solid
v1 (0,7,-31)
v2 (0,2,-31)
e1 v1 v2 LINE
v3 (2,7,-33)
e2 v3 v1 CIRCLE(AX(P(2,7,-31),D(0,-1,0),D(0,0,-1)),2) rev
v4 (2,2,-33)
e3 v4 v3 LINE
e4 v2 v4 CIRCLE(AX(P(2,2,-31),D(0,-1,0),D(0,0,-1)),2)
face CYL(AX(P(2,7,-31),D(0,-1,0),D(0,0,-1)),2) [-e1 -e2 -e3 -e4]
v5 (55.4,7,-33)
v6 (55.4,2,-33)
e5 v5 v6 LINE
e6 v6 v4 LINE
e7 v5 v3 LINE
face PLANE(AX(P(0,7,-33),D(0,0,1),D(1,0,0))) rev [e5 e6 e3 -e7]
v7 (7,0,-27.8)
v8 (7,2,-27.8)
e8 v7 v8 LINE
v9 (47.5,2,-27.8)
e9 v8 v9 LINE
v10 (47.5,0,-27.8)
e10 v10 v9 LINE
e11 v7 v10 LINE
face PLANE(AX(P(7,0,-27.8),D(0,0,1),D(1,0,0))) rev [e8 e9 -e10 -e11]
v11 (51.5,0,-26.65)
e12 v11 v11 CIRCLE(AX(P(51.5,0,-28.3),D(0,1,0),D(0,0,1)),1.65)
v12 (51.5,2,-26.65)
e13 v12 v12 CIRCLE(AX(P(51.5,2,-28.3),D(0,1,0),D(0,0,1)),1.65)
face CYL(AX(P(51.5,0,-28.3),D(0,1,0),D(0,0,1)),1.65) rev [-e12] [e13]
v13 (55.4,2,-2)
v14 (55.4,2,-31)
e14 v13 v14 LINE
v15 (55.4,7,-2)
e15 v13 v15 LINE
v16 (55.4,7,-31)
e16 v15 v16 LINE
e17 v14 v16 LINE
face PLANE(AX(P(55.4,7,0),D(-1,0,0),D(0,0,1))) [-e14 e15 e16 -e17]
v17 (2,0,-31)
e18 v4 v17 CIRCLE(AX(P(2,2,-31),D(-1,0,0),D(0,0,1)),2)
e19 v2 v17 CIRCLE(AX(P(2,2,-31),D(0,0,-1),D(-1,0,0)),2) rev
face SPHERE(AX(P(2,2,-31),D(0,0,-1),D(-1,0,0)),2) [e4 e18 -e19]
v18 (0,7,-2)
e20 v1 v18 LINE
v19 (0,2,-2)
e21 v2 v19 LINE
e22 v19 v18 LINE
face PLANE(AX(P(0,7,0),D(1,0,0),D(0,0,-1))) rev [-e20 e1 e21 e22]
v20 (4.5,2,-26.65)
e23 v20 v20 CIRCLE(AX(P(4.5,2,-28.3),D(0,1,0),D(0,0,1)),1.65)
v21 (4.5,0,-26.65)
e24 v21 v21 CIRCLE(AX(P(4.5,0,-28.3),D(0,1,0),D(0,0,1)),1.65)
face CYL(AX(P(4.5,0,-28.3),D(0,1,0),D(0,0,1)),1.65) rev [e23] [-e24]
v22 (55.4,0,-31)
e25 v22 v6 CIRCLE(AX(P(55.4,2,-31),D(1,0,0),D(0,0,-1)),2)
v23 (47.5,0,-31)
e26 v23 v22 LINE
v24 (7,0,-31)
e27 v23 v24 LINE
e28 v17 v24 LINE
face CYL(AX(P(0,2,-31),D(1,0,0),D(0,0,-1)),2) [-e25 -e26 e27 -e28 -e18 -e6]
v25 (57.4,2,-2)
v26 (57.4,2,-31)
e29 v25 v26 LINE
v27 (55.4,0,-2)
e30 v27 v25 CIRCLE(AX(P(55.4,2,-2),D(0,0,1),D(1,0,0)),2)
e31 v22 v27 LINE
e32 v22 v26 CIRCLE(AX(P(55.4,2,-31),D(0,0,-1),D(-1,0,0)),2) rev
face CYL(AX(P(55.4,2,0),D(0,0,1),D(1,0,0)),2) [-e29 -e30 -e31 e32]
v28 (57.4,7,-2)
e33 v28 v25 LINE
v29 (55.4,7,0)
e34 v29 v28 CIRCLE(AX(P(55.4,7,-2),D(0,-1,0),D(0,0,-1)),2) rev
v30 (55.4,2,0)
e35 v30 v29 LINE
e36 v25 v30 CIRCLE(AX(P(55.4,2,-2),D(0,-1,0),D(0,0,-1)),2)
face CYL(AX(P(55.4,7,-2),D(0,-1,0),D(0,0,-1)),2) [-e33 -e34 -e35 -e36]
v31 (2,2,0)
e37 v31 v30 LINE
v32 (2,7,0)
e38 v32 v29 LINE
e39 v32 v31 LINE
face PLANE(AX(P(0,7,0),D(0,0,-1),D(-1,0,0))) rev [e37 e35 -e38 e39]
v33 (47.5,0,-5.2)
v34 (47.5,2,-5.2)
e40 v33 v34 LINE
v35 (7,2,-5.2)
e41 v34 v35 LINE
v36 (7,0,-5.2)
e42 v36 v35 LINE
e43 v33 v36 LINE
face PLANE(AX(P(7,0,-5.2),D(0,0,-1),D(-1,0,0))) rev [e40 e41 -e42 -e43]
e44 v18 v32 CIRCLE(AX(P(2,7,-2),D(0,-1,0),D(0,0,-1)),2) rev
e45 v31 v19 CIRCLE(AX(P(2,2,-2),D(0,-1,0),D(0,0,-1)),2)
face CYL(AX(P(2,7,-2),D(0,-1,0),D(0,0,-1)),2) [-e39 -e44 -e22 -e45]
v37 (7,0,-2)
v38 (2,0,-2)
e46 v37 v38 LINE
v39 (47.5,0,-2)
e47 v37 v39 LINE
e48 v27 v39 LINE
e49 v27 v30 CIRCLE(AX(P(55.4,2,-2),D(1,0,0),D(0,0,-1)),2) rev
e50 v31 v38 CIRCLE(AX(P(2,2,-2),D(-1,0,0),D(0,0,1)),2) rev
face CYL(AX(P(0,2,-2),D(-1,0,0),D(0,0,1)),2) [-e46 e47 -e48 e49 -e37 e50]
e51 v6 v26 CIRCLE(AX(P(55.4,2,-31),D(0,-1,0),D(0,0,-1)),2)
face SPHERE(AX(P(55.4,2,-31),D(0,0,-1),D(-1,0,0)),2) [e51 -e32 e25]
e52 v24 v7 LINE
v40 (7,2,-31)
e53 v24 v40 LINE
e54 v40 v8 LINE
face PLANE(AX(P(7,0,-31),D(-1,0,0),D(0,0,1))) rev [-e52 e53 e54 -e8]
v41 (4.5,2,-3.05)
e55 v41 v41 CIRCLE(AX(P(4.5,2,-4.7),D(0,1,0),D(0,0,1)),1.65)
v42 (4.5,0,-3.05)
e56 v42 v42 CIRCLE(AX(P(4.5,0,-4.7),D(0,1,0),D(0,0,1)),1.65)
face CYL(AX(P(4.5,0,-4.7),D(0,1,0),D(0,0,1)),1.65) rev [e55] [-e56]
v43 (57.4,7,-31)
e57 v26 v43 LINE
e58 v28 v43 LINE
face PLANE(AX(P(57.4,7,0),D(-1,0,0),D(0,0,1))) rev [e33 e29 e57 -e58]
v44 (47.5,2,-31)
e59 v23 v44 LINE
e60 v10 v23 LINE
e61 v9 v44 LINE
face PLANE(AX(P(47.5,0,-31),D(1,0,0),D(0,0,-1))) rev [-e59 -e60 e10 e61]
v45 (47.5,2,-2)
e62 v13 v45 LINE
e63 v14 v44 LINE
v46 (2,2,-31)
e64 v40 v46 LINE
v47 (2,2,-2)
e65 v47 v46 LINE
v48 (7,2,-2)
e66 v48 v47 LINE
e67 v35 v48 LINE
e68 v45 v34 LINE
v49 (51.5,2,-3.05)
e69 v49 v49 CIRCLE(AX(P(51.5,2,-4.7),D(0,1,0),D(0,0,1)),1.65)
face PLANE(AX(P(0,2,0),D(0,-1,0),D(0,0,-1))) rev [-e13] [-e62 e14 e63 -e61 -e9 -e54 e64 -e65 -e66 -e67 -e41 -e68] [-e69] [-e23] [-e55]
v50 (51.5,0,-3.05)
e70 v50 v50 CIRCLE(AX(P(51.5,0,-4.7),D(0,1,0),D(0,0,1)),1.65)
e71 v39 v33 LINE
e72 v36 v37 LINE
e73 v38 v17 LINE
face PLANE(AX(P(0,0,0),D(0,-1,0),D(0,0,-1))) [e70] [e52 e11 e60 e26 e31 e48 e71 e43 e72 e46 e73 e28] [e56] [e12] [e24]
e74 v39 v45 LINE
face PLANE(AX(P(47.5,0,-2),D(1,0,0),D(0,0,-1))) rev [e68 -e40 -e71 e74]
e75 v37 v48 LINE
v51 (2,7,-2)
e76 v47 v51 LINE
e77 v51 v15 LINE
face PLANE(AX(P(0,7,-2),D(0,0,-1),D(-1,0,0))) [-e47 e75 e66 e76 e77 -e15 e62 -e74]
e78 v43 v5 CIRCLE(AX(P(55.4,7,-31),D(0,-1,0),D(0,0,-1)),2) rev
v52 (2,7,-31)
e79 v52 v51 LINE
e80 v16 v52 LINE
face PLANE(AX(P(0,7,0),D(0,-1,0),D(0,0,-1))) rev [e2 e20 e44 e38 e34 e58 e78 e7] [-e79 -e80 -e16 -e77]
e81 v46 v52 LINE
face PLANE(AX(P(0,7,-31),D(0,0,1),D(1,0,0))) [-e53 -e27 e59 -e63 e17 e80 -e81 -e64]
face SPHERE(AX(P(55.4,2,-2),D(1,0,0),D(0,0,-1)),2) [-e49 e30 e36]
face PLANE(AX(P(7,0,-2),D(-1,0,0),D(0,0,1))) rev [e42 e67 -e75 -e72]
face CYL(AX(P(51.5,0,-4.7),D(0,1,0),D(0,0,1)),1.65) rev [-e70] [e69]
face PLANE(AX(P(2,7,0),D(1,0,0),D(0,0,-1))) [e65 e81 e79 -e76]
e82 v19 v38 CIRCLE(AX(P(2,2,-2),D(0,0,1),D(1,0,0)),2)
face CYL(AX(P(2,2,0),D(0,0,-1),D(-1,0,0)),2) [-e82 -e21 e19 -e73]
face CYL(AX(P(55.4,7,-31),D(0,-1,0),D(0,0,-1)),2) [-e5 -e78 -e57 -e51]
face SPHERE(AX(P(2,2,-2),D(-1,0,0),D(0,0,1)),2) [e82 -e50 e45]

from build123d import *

# Parameters (mm, degrees)
SKETCH1_W           = 57.4
SKETCH1_H           = 33
BOSS_EXTRUDE1_DEPTH = 7
FILLET1_R           = 2
SHELL3_START        = 2
SHELL3_OUTLINE_W    = 5
SHELL3_OUTLINE_H    = 29
SHELL3_DEPTH        = 53.4
SKETCH2_R           = 1.65
CUT_EXTRUDE1_DEPTH  = 67.398493959
SKETCH3_W           = 40.5
SKETCH3_H           = 3.2
CUT_EXTRUDE2_DEPTH  = 67.398493959


# Read off the part's stored shape, not the designer's step: Shell3
with BuildPart() as part:
    # Sketch1 → Boss-Extrude1 (new body)
    with BuildSketch(Plane(origin=(0, 0, 0), x_dir=(1, 0, 0), z_dir=(0, 1, 0))):
        with Locations((28.7, 16.5)):
            Rectangle(SKETCH1_W, SKETCH1_H)
    extrude(amount=BOSS_EXTRUDE1_DEPTH)

    # Fillet1
    fillet1_edges = [part.edges().sort_by_distance(p)[0] for p in [
        (28.7, 0, -33),
        (57.4, 0, -16.5),
        (28.7, 0, 0),
        (0, 0, -16.5),
        (0, 3.5, -33),
        (57.4, 3.5, -33),
        (57.4, 3.5, 0),
        (0, 3.5, 0),
    ]]
    fillet(fillet1_edges, radius=FILLET1_R)

    # Shell3 outline → Shell3 (cut)
    with BuildSketch(Plane.YZ.offset(SHELL3_START)):
        with Locations((4.5, -16.5)):
            Rectangle(SHELL3_OUTLINE_W, SHELL3_OUTLINE_H)
    extrude(amount=SHELL3_DEPTH, mode=Mode.SUBTRACT)

    # Sketch2 → Cut-Extrude1 (cut, through all)
    with BuildSketch(Plane(origin=(0, 2, 0), x_dir=(1, 0, 0), z_dir=(0, 1, 0))):
        with Locations(Location((4.5, 28.3, 0), (0, 0, 270))):
            Circle(SKETCH2_R)
        with Locations(Location((51.5, 28.3, 0), (0, 0, 270))):
            Circle(SKETCH2_R)
        with Locations(Location((4.5, 4.7, 0), (0, 0, 270))):
            Circle(SKETCH2_R)
        with Locations(Location((51.5, 4.7, 0), (0, 0, 270))):
            Circle(SKETCH2_R)
    extrude(amount=-CUT_EXTRUDE1_DEPTH, mode=Mode.SUBTRACT)

    # Sketch3 → Cut-Extrude2 (cut, through all)
    with BuildSketch(Plane(origin=(0, 2, 0), x_dir=(1, 0, 0), z_dir=(0, 1, 0))):
        with Locations((27.25, 29.4)):
            Rectangle(SKETCH3_W, SKETCH3_H)
        with Locations((27.25, 3.6)):
            Rectangle(SKETCH3_W, SKETCH3_H)
    extrude(amount=-CUT_EXTRUDE2_DEPTH, mode=Mode.SUBTRACT)


solid = part.part
